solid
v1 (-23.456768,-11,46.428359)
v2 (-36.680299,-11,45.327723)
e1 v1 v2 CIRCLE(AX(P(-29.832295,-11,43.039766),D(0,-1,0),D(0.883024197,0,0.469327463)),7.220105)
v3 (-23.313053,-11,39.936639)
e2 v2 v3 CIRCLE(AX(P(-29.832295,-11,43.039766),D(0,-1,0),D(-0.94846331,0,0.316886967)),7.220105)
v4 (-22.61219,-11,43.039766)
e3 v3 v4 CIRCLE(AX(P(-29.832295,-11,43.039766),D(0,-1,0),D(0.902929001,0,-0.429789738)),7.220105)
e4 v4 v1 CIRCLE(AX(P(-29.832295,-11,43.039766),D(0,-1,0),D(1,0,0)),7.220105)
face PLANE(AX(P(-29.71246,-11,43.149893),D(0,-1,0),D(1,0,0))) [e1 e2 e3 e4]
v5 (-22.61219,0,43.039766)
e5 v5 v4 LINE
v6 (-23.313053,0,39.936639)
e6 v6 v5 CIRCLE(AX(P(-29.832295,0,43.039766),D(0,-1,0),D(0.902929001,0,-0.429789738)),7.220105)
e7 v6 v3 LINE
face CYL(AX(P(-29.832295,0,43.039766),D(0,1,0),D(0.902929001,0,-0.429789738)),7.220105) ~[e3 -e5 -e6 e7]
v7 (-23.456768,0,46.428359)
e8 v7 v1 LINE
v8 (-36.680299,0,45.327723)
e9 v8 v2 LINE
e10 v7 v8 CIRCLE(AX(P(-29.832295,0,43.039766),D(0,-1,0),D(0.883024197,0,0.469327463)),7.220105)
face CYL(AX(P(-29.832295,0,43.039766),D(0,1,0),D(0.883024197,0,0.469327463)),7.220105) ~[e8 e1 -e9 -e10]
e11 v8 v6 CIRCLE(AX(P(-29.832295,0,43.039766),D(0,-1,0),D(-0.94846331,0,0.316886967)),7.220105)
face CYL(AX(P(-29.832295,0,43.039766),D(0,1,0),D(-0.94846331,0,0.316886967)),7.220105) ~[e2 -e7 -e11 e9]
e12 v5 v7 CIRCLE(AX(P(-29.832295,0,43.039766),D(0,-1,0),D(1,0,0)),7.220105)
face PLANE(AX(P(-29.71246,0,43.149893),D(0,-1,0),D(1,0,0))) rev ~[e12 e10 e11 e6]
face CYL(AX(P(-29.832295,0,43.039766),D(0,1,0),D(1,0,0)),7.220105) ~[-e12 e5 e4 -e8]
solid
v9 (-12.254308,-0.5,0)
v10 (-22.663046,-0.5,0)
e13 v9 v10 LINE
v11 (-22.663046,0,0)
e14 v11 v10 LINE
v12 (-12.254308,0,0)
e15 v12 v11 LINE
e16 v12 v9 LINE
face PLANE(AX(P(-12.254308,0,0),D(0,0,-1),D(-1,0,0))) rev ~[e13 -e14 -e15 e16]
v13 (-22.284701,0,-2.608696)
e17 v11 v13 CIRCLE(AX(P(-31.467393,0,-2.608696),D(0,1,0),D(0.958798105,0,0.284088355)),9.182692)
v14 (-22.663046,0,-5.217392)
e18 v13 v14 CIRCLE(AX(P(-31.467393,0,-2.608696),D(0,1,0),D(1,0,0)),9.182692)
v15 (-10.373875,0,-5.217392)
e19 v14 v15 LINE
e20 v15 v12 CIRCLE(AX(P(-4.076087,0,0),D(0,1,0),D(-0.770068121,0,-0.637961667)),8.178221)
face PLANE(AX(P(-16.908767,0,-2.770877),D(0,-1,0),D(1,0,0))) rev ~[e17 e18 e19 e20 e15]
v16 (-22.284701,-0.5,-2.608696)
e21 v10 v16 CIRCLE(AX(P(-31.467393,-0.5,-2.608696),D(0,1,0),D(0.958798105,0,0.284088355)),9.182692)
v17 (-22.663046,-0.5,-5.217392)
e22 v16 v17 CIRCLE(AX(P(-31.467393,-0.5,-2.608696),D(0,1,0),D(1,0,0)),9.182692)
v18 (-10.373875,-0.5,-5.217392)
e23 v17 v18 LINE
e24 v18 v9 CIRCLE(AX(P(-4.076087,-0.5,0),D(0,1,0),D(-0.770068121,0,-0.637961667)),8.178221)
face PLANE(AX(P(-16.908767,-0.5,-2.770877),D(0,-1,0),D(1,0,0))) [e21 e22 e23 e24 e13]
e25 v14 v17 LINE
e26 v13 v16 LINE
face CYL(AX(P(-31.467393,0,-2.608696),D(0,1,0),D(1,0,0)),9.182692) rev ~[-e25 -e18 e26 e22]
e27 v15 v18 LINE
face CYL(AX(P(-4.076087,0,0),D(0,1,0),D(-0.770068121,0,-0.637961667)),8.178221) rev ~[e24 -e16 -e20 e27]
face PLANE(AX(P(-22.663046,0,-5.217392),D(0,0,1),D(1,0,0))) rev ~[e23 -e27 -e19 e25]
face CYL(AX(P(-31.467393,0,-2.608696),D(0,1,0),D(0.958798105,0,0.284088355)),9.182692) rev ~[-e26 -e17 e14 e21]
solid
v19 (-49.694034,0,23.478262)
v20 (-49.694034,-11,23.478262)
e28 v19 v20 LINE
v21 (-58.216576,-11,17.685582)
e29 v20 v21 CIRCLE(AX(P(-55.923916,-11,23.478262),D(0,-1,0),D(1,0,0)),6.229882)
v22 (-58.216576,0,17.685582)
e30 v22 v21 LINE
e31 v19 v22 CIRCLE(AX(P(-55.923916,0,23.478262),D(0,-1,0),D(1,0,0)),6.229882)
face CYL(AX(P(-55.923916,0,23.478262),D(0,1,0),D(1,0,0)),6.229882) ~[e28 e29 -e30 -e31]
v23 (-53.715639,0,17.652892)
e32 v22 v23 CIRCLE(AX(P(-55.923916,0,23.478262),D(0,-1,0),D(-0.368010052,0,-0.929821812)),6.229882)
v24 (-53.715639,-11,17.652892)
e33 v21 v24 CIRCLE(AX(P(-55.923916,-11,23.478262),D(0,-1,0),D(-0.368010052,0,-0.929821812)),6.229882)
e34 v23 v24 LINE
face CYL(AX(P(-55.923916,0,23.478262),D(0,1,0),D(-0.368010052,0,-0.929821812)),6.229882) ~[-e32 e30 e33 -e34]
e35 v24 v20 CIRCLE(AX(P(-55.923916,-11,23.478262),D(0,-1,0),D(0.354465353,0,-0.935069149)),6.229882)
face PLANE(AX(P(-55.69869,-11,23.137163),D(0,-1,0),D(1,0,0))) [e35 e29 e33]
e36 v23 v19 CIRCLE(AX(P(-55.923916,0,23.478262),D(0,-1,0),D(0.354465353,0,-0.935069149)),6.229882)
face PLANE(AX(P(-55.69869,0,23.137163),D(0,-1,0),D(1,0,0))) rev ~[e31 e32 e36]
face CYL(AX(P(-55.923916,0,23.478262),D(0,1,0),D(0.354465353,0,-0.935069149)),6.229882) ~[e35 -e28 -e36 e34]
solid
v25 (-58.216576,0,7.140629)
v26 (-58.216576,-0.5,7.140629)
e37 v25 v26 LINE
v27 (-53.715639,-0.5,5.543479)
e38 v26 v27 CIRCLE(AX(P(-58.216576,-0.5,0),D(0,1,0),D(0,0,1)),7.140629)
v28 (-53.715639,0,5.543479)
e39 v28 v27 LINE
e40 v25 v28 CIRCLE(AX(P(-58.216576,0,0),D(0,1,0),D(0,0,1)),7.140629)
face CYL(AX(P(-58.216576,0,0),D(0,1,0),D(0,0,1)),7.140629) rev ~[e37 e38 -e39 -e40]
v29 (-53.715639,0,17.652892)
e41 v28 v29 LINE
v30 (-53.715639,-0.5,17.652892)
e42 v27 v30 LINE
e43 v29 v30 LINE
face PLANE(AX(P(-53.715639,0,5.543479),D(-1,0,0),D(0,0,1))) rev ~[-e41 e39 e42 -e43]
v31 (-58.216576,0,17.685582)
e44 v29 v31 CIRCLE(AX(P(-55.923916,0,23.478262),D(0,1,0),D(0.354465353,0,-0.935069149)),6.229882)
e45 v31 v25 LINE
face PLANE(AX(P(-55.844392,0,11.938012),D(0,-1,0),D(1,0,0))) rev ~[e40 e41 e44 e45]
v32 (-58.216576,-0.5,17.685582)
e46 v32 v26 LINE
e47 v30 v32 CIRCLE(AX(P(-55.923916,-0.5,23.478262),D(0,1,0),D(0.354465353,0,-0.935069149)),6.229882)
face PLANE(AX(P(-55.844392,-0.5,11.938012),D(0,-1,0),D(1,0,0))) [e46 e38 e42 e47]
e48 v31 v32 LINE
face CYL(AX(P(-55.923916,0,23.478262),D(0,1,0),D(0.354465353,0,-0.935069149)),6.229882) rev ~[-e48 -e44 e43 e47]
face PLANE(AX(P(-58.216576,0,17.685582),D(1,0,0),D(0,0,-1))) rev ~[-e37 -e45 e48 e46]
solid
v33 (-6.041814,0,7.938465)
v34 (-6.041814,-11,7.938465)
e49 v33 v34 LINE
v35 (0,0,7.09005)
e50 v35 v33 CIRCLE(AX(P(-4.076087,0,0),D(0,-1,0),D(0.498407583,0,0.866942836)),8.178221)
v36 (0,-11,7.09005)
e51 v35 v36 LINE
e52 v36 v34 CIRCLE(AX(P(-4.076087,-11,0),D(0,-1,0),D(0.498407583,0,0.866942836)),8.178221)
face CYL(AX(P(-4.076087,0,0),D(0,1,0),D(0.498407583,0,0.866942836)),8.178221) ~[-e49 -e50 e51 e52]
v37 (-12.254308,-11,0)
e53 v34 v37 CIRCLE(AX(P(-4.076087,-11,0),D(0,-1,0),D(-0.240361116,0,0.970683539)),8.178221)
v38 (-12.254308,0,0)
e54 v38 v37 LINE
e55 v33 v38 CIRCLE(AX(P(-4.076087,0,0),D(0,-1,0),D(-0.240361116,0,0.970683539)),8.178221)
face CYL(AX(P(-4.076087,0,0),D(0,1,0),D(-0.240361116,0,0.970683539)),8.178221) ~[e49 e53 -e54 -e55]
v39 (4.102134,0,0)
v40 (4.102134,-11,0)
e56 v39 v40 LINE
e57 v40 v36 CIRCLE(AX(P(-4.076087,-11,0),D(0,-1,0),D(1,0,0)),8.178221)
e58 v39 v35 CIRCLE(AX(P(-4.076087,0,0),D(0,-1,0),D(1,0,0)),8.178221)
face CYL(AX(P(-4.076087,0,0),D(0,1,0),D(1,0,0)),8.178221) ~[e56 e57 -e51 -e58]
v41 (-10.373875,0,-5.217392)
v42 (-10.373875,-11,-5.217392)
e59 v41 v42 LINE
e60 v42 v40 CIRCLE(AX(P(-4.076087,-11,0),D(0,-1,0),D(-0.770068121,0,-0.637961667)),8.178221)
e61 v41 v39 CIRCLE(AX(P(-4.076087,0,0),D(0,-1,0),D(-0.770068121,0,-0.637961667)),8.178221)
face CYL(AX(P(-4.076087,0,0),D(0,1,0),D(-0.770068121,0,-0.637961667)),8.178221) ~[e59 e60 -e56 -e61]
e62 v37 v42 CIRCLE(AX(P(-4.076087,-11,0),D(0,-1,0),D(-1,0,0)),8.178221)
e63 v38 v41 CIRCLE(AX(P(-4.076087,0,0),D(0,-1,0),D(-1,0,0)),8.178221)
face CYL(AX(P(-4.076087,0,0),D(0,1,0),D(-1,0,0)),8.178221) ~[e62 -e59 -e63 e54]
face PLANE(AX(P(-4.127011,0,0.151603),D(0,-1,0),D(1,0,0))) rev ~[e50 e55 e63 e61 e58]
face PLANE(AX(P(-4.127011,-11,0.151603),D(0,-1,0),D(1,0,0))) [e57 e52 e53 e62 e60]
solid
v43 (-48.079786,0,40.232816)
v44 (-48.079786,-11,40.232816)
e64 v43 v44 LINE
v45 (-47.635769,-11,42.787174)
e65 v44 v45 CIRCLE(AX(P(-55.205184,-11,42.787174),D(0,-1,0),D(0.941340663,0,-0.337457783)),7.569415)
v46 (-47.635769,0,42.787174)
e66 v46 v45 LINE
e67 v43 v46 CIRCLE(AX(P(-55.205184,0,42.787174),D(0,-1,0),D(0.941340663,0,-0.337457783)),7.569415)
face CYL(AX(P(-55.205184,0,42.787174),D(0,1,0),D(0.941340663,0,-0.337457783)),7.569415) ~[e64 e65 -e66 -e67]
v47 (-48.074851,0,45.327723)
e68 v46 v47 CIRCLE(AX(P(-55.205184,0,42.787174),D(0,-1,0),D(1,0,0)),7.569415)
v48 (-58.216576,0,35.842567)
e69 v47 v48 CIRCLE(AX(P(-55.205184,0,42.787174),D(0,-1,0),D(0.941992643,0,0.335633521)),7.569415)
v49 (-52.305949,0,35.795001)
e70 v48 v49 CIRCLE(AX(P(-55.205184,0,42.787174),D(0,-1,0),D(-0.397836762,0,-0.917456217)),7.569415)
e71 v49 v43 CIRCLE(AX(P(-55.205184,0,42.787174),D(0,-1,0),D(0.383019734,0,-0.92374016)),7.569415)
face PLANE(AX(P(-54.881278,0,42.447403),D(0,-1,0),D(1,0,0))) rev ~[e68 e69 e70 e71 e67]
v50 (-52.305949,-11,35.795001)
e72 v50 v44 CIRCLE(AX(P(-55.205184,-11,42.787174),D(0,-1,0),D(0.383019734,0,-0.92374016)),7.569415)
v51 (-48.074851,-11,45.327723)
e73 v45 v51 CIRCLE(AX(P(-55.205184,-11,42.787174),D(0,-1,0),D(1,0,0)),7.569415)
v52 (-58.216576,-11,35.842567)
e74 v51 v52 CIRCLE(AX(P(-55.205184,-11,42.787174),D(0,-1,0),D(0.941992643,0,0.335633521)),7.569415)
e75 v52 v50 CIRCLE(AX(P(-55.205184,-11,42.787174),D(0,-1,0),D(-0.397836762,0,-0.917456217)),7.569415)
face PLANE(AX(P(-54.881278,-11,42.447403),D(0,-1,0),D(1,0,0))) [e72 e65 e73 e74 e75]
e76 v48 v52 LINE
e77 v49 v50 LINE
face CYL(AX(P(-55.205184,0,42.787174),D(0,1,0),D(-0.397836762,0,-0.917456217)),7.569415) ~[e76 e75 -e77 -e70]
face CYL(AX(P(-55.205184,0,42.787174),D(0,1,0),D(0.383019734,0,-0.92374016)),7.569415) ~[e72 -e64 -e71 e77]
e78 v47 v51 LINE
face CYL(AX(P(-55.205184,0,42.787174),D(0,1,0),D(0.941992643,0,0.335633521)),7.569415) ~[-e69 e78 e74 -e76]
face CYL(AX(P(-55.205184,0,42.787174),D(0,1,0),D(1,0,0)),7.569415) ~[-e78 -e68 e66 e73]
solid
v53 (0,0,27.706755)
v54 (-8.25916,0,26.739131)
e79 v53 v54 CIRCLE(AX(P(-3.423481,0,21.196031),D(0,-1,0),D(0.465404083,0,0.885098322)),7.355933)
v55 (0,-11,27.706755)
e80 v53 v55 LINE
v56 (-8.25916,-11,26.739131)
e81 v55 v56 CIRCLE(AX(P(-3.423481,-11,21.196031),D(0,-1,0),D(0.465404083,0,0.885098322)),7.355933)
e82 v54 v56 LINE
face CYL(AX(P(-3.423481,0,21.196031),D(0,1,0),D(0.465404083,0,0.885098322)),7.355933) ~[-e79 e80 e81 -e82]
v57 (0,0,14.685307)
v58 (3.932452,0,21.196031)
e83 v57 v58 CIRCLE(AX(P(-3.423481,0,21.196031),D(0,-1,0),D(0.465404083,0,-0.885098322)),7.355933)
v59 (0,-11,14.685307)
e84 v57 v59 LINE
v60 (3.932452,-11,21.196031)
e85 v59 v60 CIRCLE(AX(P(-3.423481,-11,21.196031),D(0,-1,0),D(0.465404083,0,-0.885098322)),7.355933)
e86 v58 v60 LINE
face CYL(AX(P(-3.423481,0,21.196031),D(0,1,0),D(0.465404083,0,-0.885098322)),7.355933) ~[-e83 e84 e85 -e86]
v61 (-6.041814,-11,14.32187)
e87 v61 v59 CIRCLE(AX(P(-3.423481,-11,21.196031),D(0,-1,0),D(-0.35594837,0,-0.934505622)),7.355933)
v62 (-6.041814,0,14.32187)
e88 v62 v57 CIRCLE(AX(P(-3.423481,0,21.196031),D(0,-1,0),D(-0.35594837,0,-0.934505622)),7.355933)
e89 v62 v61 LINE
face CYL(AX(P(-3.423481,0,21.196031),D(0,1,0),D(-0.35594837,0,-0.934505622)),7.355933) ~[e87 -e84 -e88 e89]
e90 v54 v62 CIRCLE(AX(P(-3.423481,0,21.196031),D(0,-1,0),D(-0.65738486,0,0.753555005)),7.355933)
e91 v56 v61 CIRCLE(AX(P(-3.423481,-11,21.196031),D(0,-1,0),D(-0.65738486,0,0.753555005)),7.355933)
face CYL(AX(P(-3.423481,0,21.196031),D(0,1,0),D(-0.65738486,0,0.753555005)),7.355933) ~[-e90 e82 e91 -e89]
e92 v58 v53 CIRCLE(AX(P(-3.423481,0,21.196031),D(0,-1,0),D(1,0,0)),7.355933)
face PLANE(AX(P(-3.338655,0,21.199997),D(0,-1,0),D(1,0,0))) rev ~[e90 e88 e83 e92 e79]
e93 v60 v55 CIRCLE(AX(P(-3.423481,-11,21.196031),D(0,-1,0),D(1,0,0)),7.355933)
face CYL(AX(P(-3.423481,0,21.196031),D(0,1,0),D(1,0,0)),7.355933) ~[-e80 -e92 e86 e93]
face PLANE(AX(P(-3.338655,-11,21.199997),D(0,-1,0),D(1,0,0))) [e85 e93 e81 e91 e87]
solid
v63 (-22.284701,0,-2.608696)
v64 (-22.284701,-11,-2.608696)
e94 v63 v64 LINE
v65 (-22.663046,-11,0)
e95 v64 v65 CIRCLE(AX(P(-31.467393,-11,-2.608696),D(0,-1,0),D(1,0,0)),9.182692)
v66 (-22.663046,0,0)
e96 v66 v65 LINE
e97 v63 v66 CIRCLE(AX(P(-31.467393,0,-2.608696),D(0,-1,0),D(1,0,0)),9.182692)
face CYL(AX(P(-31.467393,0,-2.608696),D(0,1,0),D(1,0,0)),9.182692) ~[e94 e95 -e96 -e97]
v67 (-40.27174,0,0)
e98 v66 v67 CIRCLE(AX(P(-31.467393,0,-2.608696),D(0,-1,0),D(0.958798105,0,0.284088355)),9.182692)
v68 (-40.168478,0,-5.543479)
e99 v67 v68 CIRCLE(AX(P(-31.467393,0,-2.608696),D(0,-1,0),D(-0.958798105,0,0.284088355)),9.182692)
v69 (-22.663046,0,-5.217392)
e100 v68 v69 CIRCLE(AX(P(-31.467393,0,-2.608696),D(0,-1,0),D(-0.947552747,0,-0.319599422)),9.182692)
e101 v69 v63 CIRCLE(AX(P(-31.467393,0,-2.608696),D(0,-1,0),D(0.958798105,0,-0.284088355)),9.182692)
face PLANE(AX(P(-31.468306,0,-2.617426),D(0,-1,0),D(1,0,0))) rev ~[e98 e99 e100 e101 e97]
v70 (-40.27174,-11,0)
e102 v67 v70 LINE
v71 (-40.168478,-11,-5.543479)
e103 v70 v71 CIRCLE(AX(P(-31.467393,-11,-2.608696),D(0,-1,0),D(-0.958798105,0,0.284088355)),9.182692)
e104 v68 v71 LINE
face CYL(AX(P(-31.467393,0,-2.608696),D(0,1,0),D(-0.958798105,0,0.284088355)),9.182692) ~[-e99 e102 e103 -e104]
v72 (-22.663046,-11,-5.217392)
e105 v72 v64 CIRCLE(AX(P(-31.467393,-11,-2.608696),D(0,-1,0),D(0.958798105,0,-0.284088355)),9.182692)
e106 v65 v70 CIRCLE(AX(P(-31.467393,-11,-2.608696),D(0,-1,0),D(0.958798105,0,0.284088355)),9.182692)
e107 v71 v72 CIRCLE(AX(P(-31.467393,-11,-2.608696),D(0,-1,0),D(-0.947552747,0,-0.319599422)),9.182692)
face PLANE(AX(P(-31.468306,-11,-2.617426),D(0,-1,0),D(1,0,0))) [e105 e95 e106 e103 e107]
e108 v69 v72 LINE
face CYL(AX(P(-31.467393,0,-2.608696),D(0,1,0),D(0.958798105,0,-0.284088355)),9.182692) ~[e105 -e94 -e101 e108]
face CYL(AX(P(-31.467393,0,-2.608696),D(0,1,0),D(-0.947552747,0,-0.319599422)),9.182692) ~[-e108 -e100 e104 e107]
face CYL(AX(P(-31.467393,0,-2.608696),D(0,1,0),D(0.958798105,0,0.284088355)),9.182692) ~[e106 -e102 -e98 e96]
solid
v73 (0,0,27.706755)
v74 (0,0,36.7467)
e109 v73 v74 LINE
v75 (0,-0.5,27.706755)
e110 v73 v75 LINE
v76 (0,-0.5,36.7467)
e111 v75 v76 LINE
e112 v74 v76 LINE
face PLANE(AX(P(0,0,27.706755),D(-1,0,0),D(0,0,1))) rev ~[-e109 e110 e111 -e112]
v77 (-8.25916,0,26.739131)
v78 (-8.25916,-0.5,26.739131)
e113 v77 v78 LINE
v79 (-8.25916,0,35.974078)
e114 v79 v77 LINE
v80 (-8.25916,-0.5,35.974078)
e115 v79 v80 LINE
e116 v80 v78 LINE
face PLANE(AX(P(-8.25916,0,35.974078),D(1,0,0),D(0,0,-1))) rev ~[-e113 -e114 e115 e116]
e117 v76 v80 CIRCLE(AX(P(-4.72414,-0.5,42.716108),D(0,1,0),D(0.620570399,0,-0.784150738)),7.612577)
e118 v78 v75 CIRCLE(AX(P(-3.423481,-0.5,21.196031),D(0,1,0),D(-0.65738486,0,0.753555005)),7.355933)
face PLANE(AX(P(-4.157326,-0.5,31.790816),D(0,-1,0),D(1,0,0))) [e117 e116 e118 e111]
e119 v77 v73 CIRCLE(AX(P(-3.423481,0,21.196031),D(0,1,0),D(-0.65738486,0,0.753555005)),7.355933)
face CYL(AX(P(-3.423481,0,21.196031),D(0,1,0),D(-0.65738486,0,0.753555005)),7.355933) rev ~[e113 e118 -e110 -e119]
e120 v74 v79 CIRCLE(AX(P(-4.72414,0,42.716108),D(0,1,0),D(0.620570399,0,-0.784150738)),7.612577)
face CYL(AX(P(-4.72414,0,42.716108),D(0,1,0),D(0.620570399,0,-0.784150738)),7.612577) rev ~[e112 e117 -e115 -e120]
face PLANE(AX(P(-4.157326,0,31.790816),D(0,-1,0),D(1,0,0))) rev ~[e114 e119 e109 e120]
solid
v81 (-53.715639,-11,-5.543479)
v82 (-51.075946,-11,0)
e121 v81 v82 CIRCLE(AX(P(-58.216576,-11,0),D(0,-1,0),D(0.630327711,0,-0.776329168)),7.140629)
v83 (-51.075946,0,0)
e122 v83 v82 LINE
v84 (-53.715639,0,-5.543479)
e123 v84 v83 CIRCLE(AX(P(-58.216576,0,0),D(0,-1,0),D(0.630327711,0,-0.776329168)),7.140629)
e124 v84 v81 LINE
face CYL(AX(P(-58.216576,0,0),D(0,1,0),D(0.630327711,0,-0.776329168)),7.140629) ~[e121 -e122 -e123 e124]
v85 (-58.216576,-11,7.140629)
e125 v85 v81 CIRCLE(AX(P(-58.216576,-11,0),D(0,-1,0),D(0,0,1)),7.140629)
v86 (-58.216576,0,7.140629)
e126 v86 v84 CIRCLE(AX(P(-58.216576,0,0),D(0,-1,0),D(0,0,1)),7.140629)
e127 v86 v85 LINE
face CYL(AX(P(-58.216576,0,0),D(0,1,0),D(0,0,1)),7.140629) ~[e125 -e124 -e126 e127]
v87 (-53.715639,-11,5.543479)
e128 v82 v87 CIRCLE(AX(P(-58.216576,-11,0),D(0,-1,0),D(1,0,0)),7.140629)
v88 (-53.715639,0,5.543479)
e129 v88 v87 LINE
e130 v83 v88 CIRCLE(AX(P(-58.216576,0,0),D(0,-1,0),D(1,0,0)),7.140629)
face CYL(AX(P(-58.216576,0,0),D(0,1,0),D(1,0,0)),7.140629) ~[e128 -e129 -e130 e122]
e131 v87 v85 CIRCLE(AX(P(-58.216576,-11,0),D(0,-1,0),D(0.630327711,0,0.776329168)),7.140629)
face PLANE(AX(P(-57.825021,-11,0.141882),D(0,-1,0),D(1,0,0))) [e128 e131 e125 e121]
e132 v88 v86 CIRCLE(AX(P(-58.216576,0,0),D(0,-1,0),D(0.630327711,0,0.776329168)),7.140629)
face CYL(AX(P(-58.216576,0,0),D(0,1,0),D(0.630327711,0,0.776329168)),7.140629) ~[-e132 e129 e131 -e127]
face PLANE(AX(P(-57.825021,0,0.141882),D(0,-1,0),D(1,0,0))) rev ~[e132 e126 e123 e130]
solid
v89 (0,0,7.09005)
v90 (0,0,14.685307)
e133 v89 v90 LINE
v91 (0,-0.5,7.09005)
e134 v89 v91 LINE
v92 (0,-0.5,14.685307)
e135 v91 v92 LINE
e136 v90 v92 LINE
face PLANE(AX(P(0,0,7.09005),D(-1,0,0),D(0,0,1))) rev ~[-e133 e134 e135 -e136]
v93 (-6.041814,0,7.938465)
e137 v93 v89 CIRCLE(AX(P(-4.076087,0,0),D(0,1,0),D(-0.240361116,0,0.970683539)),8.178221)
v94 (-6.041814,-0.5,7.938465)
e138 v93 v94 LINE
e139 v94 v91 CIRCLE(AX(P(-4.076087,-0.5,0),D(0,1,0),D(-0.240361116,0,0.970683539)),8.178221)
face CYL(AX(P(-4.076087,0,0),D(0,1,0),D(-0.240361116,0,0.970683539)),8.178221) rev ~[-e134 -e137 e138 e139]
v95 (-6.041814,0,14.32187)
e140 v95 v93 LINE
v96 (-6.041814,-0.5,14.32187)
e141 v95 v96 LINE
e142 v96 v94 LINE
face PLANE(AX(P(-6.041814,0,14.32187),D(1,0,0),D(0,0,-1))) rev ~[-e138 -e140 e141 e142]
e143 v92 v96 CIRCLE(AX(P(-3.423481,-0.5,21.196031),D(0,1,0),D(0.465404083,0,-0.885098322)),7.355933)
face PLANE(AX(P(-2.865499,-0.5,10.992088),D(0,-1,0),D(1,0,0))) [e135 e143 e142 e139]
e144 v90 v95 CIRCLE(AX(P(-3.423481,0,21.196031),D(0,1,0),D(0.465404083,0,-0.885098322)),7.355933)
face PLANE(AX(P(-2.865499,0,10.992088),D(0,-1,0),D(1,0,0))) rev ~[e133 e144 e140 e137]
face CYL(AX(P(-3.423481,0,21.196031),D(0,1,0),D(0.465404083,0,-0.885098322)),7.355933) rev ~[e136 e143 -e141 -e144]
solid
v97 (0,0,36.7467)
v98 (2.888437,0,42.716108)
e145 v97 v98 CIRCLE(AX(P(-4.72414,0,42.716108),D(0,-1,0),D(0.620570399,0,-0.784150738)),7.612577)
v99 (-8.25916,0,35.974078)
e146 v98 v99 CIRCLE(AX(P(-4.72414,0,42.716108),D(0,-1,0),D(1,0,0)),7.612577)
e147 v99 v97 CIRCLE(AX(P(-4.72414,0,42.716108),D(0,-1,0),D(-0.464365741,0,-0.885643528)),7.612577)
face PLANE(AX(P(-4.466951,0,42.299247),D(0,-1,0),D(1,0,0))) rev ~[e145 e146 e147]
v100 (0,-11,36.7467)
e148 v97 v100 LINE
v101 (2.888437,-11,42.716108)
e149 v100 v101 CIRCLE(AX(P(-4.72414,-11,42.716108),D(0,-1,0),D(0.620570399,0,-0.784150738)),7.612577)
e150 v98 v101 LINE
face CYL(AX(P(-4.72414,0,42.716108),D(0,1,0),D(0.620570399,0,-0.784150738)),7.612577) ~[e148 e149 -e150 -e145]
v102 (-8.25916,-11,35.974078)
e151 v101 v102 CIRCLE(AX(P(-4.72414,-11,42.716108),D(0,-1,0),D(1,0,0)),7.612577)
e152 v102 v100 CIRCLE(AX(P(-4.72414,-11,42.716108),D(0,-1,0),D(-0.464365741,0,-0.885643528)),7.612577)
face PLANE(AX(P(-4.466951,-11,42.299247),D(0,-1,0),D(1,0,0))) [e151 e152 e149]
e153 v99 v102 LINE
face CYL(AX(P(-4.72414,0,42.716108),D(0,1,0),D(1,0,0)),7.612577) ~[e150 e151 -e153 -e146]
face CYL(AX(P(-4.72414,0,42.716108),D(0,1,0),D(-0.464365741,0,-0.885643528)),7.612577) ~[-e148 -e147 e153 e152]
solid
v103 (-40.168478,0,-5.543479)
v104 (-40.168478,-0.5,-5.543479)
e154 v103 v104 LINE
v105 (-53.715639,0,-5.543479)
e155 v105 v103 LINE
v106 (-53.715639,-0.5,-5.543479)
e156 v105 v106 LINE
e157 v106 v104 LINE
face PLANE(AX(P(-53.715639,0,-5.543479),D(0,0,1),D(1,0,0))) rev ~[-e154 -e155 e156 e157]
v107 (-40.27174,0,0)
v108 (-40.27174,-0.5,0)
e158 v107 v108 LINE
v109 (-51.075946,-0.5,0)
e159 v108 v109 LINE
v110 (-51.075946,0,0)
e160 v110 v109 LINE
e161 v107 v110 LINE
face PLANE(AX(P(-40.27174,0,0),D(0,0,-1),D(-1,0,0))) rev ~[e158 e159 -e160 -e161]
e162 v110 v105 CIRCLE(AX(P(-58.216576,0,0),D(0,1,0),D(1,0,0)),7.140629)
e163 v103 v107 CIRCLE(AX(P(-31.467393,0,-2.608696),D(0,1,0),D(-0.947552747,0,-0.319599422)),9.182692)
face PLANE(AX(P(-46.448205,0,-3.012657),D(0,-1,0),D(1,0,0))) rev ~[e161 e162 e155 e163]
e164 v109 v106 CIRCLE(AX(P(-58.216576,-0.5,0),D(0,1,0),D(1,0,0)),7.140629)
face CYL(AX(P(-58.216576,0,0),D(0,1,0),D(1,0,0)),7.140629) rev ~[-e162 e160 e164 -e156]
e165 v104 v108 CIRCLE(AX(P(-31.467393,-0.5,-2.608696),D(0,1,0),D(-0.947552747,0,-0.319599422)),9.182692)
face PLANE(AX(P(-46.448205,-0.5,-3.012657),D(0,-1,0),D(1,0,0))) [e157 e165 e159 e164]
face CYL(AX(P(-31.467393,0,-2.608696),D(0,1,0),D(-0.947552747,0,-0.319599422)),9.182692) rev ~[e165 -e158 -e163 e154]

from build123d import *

# Parameters (mm, degrees)
F1_DEPTH = 11
F2_DEPTH = 11
F3_DEPTH = 0.5


# Not quite as in the source:
# - the program builds the solid bodies; features that only make, move or delete a surface that nothing else refers to are left out


with BuildPart() as f1:
    # F0 (on Front) → F1 (new body)
    with BuildSketch(Plane.XZ):
        with BuildLine():
            ThreePointArc((-48.0797858384, 40.2328155244), (-47.7475992787, 41.4908425789), (-47.6357689738, 42.7871735409))
            ThreePointArc((-47.6357689738, 42.7871735409), (-47.7463471065, 44.0762802216), (-48.0748507334, 45.3277229588))
            ThreePointArc((-48.0748507334, 45.3277229588), (-60.375625727, 48.3155165258), (-58.2165755639, 35.8425666648))
            ThreePointArc((-58.2165755639, 35.8425666648), (-55.2660968969, 35.2180036102), (-52.3059486726, 35.7950008925))
            ThreePointArc((-52.3059486726, 35.7950008925), (-49.723681576, 37.5670993069), (-48.0797858384, 40.2328155244))
        make_face()
    extrude(amount=F1_DEPTH)


with BuildPart() as f2:
    # F0 (on Front) → F2 (new body)
    with BuildSketch(Plane.XZ):
        with BuildLine():
            ThreePointArc((-23.456767508, 46.4283592716), (-30.4311757631, 50.2349900835), (-36.6802987427, 45.3277229588))
            ThreePointArc((-36.6802987427, 45.3277229588), (-32.5328439874, 36.3437266645), (-23.3130527419, 39.9366390976))
            ThreePointArc((-23.3130527419, 39.9366390976), (-22.7895849326, 41.4491210345), (-22.612189983, 43.0397659315))
            ThreePointArc((-22.612189983, 43.0397659315), (-22.8265154402, 44.7858956532), (-23.456767508, 46.4283592716))
        make_face()
    extrude(amount=F2_DEPTH)


with BuildPart() as f2b:
    # F0 (on Front) → F2, piece 2 (new body)
    with BuildSketch(Plane.XZ):
        with BuildLine():
            ThreePointArc((0, 36.7466998694), (2.1283855445, 39.4003538773), (2.8884372282, 42.7161080988))
            ThreePointArc((2.8884372282, 42.7161080988), (-8.6637290747, 49.2300143883), (-8.2591603931, 35.9740781474))
            ThreePointArc((-8.2591603931, 35.9740781474), (-4.0151002339, 35.1366227762), (0, 36.7466998694))
        make_face()
    extrude(amount=F2_DEPTH)


with BuildPart() as f2c:
    # F0 (on Front) → F2, piece 3 (new body)
    with BuildSketch(Plane.XZ):
        with BuildLine():
            ThreePointArc((0, 27.7067552004), (-4.2794308504, 28.5019946278), (-8.2591603931, 26.7391313554))
            ThreePointArc((-8.2591603931, 26.7391313554), (-10.6648668946, 19.9029390291), (-6.0418137213, 14.3218702558))
            ThreePointArc((-6.0418137213, 14.3218702558), (-2.9817939053, 13.8533705398), (0, 14.6853070545))
            ThreePointArc((0, 14.6853070545), (2.8730515364, 17.3929499669), (3.9324518182, 21.1960311275))
            ThreePointArc((3.9324518182, 21.1960311275), (2.8730515364, 24.9991122881), (0, 27.7067552004))
        make_face()
    extrude(amount=F2_DEPTH)


with BuildPart() as f2d:
    # F0 (on Front) → F2, piece 4 (new body)
    with BuildSketch(Plane.XZ):
        with BuildLine():
            ThreePointArc((0, 7.0900501454), (-2.9388285364, 8.0987617403), (-6.0418137213, 7.9384645471))
            ThreePointArc((-6.0418137213, 7.9384645471), (-10.5165626716, 5.0401961715), (-12.2543084234, 0))
            ThreePointArc((-12.2543084234, 0), (-11.7698509636, -2.7729589527), (-10.3738746923, -5.2173915319))
            ThreePointArc((-10.3738746923, -5.2173915319), (-1.303128429, -7.6937635819), (4.10213366, 0))
            ThreePointArc((4.10213366, 0), (3.0026993435, 4.0956169141), (0, 7.0900501454))
        make_face()
    extrude(amount=F2_DEPTH)


with BuildPart() as f2e:
    # F0 (on Front) → F2, piece 5 (new body)
    with BuildSketch(Plane.XZ):
        with BuildLine():
            ThreePointArc((-22.2847013796, -2.608695766), (-22.3797796773, -1.2907012663), (-22.6630456746, 0))
            ThreePointArc((-22.6630456746, 0), (-31.4673930407, 6.5739958951), (-40.2717404068, 0))
            ThreePointArc((-40.2717404068, 0), (-40.6484919474, -2.7797191761), (-40.1684777533, -5.5434787162))
            ThreePointArc((-40.1684777533, -5.5434787162), (-31.2963696305, -11.7897946727), (-22.6630456746, -5.2173915319))
            ThreePointArc((-22.6630456746, -5.2173915319), (-22.3797796773, -3.9266902656), (-22.2847013796, -2.608695766))
        make_face()
    extrude(amount=F2_DEPTH)


with BuildPart() as f2f:
    # F0 (on Front) → F2, piece 6 (new body)
    with BuildSketch(Plane.XZ):
        with BuildLine():
            ThreePointArc((-53.7156391117, -5.5434787162), (-51.7695567399, -3.0699403099), (-51.0759463743, 0))
            ThreePointArc((-51.0759463743, 0), (-51.7695567399, 3.0699403099), (-53.7156391117, 5.5434787162))
            ThreePointArc((-53.7156391117, 5.5434787162), (-55.8286204459, 6.7295063399), (-58.2165755639, 7.1406291896))
            ThreePointArc((-58.2165755639, 7.1406291896), (-64.9460819038, -2.387955118), (-53.7156391117, -5.5434787162))
        make_face()
    extrude(amount=F2_DEPTH)


with BuildPart() as f2g:
    # F0 (on Front) → F2, piece 7 (new body)
    with BuildSketch(Plane.XZ):
        with BuildLine():
            ThreePointArc((-58.2165755639, 17.6855820413), (-55.9691628256, 17.2485445266), (-53.7156391117, 17.6528917491))
            ThreePointArc((-53.7156391117, 17.6528917491), (-50.7970881723, 19.9389032943), (-49.6940344894, 23.4782621264))
            ThreePointArc((-49.6940344894, 23.4782621264), (-59.4259467219, 28.6306608138), (-58.2165755639, 17.6855820413))
        make_face()
    extrude(amount=F2_DEPTH)


with BuildPart() as f3:
    # F0 (on Front) → F3 (new body)
    with BuildSketch(Plane.XZ):
        with BuildLine():
            ThreePointArc((-40.1684777533, -5.5434787162), (-40.6484919474, -2.7797191761), (-40.2717404068, 0))
            Line((-40.2717404068, 0), (-51.0759463743, 0))
            ThreePointArc((-51.0759463743, 0), (-51.7695567399, -3.0699403099), (-53.7156391117, -5.5434787162))
            Line((-53.7156391117, -5.5434787162), (-40.1684777533, -5.5434787162))
        make_face()
    extrude(amount=F3_DEPTH)


with BuildPart() as f3b:
    # F0 (on Front) → F3, piece 2 (new body)
    with BuildSketch(Plane.XZ):
        with BuildLine():
            ThreePointArc((-10.3738746923, -5.2173915319), (-11.7698509636, -2.7729589527), (-12.2543084234, 0))
            Line((-12.2543084234, 0), (-22.6630456746, 0))
            ThreePointArc((-22.6630456746, 0), (-22.3797796773, -1.2907012663), (-22.2847013796, -2.608695766))
            ThreePointArc((-22.2847013796, -2.608695766), (-22.3797796773, -3.9266902656), (-22.6630456746, -5.2173915319))
            Line((-22.6630456746, -5.2173915319), (-10.3738746923, -5.2173915319))
        make_face()
    extrude(amount=F3_DEPTH)


with BuildPart() as f3c:
    # F0 (on Front) → F3, piece 3 (new body)
    with BuildSketch(Plane.XZ):
        with BuildLine():
            ThreePointArc((0, 14.6853070545), (-2.9817939053, 13.8533705398), (-6.0418137213, 14.3218702558))
            Line((-6.0418137213, 14.3218702558), (-6.0418137213, 7.9384645471))
            ThreePointArc((-6.0418137213, 7.9384645471), (-2.9388285364, 8.0987617403), (0, 7.0900501454))
            Line((0, 7.0900501454), (0, 14.6853070545))
        make_face()
    extrude(amount=F3_DEPTH)


with BuildPart() as f3d:
    # F0 (on Front) → F3, piece 4 (new body)
    with BuildSketch(Plane.XZ):
        with BuildLine():
            ThreePointArc((0, 36.7466998694), (-4.0151002339, 35.1366227762), (-8.2591603931, 35.9740781474))
            Line((-8.2591603931, 35.9740781474), (-8.2591603931, 26.7391313554))
            ThreePointArc((-8.2591603931, 26.7391313554), (-4.2794308504, 28.5019946278), (0, 27.7067552004))
            Line((0, 27.7067552004), (0, 36.7466998694))
        make_face()
    extrude(amount=F3_DEPTH)


with BuildPart() as f3e:
    # F0 (on Front) → F3, piece 5 (new body)
    with BuildSketch(Plane.XZ):
        with BuildLine():
            ThreePointArc((-58.2165755639, 7.1406291896), (-55.8286204459, 6.7295063399), (-53.7156391117, 5.5434787162))
            Line((-53.7156391117, 5.5434787162), (-53.7156391117, 17.6528917491))
            ThreePointArc((-53.7156391117, 17.6528917491), (-55.9691628256, 17.2485445266), (-58.2165755639, 17.6855820413))
            Line((-58.2165755639, 17.6855820413), (-58.2165755639, 7.1406291896))
        make_face()
    extrude(amount=F3_DEPTH)


solid = Compound([f1.part, f2.part, f2b.part, f2c.part, f2d.part, f2e.part, f2f.part, f2g.part, f3.part, f3b.part, f3c.part, f3d.part, f3e.part])
